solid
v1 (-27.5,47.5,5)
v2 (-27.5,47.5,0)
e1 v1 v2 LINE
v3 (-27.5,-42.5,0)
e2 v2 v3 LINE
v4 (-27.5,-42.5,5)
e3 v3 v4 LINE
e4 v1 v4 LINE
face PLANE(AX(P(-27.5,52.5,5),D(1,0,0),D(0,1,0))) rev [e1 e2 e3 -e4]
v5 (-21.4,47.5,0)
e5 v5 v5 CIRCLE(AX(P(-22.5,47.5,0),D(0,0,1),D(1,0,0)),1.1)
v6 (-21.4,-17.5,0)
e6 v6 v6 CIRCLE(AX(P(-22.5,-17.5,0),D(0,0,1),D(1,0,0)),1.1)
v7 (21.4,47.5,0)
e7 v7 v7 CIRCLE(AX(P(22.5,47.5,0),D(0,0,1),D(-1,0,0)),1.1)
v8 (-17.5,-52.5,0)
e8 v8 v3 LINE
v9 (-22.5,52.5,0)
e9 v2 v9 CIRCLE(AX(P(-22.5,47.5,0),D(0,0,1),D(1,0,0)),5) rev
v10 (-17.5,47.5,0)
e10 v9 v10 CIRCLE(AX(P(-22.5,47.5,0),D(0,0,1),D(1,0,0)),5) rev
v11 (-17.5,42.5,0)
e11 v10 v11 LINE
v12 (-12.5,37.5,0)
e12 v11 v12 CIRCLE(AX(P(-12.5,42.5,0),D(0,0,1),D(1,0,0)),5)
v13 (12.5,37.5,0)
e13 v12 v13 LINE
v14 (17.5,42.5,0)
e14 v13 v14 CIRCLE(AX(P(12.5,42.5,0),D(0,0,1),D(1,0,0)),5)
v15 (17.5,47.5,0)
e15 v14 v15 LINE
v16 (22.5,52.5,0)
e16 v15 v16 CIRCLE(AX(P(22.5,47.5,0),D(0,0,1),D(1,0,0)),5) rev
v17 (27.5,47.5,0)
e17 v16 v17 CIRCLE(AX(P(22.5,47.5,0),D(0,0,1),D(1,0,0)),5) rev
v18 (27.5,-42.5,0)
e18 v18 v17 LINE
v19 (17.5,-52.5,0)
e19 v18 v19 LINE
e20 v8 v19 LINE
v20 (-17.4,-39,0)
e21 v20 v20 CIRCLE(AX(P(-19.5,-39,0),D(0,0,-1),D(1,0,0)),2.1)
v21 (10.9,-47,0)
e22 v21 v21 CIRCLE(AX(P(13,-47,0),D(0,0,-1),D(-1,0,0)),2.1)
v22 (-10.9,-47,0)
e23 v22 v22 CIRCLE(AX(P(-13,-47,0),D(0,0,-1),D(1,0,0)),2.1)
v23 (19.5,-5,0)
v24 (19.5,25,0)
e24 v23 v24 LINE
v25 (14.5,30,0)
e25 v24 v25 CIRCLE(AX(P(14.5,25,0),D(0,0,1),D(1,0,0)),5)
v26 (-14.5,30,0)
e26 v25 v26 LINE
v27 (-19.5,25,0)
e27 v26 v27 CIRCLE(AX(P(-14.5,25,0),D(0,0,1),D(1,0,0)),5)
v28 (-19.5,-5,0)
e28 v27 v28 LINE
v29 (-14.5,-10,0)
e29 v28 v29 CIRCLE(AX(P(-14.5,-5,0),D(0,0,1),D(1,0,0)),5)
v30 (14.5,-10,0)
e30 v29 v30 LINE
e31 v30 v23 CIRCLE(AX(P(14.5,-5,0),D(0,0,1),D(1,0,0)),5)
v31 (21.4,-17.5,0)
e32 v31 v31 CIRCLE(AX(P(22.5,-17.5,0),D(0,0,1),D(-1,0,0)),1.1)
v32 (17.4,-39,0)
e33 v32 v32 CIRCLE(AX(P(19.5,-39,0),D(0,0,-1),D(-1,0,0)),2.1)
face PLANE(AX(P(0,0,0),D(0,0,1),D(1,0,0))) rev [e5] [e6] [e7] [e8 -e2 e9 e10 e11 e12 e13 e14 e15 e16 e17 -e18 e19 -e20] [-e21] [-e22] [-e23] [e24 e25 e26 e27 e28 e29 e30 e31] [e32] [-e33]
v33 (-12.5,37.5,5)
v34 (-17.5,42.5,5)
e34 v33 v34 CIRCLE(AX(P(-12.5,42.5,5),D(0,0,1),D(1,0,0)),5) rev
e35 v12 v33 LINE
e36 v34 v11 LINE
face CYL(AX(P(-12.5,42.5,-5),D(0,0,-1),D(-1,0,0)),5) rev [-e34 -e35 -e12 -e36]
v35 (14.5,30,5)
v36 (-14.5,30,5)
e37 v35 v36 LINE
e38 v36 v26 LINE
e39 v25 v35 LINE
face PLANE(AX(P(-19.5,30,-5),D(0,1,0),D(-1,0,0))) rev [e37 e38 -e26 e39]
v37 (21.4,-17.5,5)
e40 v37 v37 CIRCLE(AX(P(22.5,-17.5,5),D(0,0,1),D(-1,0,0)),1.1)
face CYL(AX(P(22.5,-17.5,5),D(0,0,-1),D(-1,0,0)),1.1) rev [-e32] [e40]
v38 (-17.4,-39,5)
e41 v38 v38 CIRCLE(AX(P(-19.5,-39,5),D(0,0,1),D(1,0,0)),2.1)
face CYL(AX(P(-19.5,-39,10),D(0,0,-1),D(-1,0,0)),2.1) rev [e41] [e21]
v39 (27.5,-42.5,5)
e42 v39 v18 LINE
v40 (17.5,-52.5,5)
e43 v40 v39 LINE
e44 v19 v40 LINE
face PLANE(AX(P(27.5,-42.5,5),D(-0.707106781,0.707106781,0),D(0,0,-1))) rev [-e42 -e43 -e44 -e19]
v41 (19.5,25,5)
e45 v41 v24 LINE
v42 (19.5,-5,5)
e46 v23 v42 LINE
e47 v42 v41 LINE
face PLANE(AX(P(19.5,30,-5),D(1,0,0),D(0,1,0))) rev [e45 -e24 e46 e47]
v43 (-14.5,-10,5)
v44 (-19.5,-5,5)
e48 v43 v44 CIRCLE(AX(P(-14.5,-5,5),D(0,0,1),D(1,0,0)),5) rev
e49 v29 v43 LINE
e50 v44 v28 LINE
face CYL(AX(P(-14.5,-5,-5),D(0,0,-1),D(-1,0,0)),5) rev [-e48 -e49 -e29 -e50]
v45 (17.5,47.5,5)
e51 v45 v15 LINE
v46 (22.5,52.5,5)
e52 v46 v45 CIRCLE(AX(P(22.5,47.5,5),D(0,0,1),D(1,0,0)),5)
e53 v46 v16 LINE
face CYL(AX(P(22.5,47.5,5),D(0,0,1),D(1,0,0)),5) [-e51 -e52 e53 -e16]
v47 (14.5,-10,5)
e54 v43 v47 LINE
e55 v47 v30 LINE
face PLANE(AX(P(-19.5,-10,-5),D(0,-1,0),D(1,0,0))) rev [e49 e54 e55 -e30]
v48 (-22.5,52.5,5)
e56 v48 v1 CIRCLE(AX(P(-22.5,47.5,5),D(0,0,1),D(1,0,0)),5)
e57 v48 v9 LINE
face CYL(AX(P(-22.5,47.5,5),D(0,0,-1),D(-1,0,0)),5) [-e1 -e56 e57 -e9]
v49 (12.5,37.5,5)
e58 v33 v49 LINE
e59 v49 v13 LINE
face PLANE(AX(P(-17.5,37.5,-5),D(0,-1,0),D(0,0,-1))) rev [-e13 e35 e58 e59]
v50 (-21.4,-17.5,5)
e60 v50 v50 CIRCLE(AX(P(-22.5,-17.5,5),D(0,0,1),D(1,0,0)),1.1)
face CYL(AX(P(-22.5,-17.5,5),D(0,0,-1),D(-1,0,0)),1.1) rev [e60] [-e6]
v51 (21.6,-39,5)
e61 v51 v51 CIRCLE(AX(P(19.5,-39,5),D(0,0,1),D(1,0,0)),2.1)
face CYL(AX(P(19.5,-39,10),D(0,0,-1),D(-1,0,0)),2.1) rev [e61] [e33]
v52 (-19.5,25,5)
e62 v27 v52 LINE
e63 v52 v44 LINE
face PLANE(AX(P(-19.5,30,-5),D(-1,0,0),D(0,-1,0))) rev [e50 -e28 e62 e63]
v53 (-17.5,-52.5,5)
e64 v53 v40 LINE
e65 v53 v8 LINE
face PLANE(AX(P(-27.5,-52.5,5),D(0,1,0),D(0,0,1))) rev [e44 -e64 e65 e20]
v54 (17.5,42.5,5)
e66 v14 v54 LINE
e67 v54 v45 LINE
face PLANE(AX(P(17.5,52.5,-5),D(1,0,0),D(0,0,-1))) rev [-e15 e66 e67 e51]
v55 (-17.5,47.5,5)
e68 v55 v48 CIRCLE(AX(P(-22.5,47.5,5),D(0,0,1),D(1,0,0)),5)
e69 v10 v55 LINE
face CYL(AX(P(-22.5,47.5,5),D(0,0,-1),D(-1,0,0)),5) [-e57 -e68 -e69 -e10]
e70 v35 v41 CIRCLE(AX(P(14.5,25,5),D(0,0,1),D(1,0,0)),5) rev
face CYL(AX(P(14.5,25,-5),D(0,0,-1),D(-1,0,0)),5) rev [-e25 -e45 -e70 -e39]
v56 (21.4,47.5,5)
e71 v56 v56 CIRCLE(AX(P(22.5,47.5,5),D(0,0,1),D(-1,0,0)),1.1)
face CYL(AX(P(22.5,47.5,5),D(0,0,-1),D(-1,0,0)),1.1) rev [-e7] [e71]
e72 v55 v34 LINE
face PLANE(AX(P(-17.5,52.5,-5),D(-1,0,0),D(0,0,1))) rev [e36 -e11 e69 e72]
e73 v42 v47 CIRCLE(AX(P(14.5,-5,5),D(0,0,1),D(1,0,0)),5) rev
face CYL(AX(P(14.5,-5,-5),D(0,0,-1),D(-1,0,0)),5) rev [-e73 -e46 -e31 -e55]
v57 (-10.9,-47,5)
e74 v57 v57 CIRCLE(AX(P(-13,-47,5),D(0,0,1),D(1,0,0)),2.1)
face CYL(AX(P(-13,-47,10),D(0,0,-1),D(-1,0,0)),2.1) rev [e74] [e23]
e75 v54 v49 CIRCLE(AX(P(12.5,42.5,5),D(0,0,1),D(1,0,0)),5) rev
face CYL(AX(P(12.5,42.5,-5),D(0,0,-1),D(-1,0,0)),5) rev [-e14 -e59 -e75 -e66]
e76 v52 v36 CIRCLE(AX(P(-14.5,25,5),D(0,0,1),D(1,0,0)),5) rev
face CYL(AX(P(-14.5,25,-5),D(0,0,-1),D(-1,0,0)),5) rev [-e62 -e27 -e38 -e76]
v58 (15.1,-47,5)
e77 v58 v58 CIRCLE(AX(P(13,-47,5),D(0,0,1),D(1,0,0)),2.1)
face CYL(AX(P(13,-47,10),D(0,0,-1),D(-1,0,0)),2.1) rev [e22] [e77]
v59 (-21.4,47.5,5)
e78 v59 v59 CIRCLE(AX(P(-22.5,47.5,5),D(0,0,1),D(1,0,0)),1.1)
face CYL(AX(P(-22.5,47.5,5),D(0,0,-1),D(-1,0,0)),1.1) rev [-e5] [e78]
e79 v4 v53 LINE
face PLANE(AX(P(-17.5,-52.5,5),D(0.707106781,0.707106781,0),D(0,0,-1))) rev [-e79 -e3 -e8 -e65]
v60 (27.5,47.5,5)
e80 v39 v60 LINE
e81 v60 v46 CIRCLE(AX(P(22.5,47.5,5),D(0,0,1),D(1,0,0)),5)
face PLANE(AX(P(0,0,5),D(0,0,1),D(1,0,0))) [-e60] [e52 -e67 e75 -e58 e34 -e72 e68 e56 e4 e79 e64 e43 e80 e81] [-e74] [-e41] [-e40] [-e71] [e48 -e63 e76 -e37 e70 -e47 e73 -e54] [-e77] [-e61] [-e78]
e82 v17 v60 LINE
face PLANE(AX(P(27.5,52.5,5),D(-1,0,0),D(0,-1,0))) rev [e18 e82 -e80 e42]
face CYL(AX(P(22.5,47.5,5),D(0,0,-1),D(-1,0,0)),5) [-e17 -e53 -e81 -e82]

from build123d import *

# Parameters (mm, degrees)
SKETCH_1_W          = 55
SKETCH_1_H          = 105
SKETCH_1_R          = 1.1
EXTRUDE_1_DEPTH     = 5
CHAMFER_1_SIZE      = 10
SKETCH_4_R          = 2.1
CUT_EXTRUDE_1_DEPTH = 10
SKETCH_5_W          = 35
SKETCH_5_H          = 15
CUT_EXTRUDE_2_DEPTH = 10
SKETCH_6_W          = 39
SKETCH_6_H          = 40
CUT_EXTRUDE_3_DEPTH = 10
FILLET_3_R          = 5
FILLET_4_R          = 5


with BuildPart() as part:
    # 草图1 → 凸台-拉伸1 (new body)
    with BuildSketch(Plane.XY):
        Rectangle(SKETCH_1_W, SKETCH_1_H)
        with Locations((-22.5, 47.5)):
            Circle(SKETCH_1_R, mode=Mode.SUBTRACT)
        with Locations(Location((22.5, 47.5, 0), (0, 0, 180))):
            Circle(SKETCH_1_R, mode=Mode.SUBTRACT)
        with Locations((-22.5, -17.5)):
            Circle(SKETCH_1_R, mode=Mode.SUBTRACT)
        with Locations(Location((22.5, -17.5, 0), (0, 0, 180))):
            Circle(SKETCH_1_R, mode=Mode.SUBTRACT)
    extrude(amount=EXTRUDE_1_DEPTH)

    # 倒角1
    chamfer_1_edges = [part.edges().sort_by_distance(p)[0] for p in [
        (27.5, -52.5, 2.5),
        (-27.5, -52.5, 2.5),
    ]]
    chamfer(chamfer_1_edges, length=CHAMFER_1_SIZE)

    # 草图4 → 切除-拉伸1 (cut)
    with BuildSketch(Plane(origin=(0, 0, 0), x_dir=(-1, 0, 0), z_dir=(0, 0, -1))):
        with Locations((-13, -47)):
            Circle(SKETCH_4_R)
        with Locations((-19.5, -39)):
            Circle(SKETCH_4_R)
        with Locations(Location((19.5, -39, 0), (0, 0, 180))):
            Circle(SKETCH_4_R)
        with Locations(Location((13, -47, 0), (0, 0, 180))):
            Circle(SKETCH_4_R)
    extrude(amount=-CUT_EXTRUDE_1_DEPTH, mode=Mode.SUBTRACT)

    # 草图5 → 切除-拉伸2 (cut)
    with BuildSketch(Plane.XY.offset(5)):
        with Locations((0, 45)):
            Rectangle(SKETCH_5_W, SKETCH_5_H)
    extrude(amount=-CUT_EXTRUDE_2_DEPTH, mode=Mode.SUBTRACT)

    # 草图6 → 切除-拉伸3 (cut)
    with BuildSketch(Plane.XY.offset(5)):
        with Locations((0, 10)):
            Rectangle(SKETCH_6_W, SKETCH_6_H)
    extrude(amount=-CUT_EXTRUDE_3_DEPTH, mode=Mode.SUBTRACT)

    # 圆角3
    fillet_3_edges = [part.edges().sort_by_distance(p)[0] for p in [
        (19.5, 30, 2.5),
        (19.5, -10, 2.5),
        (-19.5, -10, 2.5),
        (-19.5, 30, 2.5),
    ]]
    fillet(fillet_3_edges, radius=FILLET_3_R)

    # 圆角4
    fillet_4_edges = [part.edges().sort_by_distance(p)[0] for p in [
        (17.5, 52.5, 2.5),
        (27.5, 52.5, 2.5),
        (-27.5, 52.5, 2.5),
        (-17.5, 52.5, 2.5),
        (17.5, 37.5, 2.5),
        (-17.5, 37.5, 2.5),
    ]]
    fillet(fillet_4_edges, radius=FILLET_4_R - 0.0001)  # a hair under: the kernel refuses the full size


solid = part.part
